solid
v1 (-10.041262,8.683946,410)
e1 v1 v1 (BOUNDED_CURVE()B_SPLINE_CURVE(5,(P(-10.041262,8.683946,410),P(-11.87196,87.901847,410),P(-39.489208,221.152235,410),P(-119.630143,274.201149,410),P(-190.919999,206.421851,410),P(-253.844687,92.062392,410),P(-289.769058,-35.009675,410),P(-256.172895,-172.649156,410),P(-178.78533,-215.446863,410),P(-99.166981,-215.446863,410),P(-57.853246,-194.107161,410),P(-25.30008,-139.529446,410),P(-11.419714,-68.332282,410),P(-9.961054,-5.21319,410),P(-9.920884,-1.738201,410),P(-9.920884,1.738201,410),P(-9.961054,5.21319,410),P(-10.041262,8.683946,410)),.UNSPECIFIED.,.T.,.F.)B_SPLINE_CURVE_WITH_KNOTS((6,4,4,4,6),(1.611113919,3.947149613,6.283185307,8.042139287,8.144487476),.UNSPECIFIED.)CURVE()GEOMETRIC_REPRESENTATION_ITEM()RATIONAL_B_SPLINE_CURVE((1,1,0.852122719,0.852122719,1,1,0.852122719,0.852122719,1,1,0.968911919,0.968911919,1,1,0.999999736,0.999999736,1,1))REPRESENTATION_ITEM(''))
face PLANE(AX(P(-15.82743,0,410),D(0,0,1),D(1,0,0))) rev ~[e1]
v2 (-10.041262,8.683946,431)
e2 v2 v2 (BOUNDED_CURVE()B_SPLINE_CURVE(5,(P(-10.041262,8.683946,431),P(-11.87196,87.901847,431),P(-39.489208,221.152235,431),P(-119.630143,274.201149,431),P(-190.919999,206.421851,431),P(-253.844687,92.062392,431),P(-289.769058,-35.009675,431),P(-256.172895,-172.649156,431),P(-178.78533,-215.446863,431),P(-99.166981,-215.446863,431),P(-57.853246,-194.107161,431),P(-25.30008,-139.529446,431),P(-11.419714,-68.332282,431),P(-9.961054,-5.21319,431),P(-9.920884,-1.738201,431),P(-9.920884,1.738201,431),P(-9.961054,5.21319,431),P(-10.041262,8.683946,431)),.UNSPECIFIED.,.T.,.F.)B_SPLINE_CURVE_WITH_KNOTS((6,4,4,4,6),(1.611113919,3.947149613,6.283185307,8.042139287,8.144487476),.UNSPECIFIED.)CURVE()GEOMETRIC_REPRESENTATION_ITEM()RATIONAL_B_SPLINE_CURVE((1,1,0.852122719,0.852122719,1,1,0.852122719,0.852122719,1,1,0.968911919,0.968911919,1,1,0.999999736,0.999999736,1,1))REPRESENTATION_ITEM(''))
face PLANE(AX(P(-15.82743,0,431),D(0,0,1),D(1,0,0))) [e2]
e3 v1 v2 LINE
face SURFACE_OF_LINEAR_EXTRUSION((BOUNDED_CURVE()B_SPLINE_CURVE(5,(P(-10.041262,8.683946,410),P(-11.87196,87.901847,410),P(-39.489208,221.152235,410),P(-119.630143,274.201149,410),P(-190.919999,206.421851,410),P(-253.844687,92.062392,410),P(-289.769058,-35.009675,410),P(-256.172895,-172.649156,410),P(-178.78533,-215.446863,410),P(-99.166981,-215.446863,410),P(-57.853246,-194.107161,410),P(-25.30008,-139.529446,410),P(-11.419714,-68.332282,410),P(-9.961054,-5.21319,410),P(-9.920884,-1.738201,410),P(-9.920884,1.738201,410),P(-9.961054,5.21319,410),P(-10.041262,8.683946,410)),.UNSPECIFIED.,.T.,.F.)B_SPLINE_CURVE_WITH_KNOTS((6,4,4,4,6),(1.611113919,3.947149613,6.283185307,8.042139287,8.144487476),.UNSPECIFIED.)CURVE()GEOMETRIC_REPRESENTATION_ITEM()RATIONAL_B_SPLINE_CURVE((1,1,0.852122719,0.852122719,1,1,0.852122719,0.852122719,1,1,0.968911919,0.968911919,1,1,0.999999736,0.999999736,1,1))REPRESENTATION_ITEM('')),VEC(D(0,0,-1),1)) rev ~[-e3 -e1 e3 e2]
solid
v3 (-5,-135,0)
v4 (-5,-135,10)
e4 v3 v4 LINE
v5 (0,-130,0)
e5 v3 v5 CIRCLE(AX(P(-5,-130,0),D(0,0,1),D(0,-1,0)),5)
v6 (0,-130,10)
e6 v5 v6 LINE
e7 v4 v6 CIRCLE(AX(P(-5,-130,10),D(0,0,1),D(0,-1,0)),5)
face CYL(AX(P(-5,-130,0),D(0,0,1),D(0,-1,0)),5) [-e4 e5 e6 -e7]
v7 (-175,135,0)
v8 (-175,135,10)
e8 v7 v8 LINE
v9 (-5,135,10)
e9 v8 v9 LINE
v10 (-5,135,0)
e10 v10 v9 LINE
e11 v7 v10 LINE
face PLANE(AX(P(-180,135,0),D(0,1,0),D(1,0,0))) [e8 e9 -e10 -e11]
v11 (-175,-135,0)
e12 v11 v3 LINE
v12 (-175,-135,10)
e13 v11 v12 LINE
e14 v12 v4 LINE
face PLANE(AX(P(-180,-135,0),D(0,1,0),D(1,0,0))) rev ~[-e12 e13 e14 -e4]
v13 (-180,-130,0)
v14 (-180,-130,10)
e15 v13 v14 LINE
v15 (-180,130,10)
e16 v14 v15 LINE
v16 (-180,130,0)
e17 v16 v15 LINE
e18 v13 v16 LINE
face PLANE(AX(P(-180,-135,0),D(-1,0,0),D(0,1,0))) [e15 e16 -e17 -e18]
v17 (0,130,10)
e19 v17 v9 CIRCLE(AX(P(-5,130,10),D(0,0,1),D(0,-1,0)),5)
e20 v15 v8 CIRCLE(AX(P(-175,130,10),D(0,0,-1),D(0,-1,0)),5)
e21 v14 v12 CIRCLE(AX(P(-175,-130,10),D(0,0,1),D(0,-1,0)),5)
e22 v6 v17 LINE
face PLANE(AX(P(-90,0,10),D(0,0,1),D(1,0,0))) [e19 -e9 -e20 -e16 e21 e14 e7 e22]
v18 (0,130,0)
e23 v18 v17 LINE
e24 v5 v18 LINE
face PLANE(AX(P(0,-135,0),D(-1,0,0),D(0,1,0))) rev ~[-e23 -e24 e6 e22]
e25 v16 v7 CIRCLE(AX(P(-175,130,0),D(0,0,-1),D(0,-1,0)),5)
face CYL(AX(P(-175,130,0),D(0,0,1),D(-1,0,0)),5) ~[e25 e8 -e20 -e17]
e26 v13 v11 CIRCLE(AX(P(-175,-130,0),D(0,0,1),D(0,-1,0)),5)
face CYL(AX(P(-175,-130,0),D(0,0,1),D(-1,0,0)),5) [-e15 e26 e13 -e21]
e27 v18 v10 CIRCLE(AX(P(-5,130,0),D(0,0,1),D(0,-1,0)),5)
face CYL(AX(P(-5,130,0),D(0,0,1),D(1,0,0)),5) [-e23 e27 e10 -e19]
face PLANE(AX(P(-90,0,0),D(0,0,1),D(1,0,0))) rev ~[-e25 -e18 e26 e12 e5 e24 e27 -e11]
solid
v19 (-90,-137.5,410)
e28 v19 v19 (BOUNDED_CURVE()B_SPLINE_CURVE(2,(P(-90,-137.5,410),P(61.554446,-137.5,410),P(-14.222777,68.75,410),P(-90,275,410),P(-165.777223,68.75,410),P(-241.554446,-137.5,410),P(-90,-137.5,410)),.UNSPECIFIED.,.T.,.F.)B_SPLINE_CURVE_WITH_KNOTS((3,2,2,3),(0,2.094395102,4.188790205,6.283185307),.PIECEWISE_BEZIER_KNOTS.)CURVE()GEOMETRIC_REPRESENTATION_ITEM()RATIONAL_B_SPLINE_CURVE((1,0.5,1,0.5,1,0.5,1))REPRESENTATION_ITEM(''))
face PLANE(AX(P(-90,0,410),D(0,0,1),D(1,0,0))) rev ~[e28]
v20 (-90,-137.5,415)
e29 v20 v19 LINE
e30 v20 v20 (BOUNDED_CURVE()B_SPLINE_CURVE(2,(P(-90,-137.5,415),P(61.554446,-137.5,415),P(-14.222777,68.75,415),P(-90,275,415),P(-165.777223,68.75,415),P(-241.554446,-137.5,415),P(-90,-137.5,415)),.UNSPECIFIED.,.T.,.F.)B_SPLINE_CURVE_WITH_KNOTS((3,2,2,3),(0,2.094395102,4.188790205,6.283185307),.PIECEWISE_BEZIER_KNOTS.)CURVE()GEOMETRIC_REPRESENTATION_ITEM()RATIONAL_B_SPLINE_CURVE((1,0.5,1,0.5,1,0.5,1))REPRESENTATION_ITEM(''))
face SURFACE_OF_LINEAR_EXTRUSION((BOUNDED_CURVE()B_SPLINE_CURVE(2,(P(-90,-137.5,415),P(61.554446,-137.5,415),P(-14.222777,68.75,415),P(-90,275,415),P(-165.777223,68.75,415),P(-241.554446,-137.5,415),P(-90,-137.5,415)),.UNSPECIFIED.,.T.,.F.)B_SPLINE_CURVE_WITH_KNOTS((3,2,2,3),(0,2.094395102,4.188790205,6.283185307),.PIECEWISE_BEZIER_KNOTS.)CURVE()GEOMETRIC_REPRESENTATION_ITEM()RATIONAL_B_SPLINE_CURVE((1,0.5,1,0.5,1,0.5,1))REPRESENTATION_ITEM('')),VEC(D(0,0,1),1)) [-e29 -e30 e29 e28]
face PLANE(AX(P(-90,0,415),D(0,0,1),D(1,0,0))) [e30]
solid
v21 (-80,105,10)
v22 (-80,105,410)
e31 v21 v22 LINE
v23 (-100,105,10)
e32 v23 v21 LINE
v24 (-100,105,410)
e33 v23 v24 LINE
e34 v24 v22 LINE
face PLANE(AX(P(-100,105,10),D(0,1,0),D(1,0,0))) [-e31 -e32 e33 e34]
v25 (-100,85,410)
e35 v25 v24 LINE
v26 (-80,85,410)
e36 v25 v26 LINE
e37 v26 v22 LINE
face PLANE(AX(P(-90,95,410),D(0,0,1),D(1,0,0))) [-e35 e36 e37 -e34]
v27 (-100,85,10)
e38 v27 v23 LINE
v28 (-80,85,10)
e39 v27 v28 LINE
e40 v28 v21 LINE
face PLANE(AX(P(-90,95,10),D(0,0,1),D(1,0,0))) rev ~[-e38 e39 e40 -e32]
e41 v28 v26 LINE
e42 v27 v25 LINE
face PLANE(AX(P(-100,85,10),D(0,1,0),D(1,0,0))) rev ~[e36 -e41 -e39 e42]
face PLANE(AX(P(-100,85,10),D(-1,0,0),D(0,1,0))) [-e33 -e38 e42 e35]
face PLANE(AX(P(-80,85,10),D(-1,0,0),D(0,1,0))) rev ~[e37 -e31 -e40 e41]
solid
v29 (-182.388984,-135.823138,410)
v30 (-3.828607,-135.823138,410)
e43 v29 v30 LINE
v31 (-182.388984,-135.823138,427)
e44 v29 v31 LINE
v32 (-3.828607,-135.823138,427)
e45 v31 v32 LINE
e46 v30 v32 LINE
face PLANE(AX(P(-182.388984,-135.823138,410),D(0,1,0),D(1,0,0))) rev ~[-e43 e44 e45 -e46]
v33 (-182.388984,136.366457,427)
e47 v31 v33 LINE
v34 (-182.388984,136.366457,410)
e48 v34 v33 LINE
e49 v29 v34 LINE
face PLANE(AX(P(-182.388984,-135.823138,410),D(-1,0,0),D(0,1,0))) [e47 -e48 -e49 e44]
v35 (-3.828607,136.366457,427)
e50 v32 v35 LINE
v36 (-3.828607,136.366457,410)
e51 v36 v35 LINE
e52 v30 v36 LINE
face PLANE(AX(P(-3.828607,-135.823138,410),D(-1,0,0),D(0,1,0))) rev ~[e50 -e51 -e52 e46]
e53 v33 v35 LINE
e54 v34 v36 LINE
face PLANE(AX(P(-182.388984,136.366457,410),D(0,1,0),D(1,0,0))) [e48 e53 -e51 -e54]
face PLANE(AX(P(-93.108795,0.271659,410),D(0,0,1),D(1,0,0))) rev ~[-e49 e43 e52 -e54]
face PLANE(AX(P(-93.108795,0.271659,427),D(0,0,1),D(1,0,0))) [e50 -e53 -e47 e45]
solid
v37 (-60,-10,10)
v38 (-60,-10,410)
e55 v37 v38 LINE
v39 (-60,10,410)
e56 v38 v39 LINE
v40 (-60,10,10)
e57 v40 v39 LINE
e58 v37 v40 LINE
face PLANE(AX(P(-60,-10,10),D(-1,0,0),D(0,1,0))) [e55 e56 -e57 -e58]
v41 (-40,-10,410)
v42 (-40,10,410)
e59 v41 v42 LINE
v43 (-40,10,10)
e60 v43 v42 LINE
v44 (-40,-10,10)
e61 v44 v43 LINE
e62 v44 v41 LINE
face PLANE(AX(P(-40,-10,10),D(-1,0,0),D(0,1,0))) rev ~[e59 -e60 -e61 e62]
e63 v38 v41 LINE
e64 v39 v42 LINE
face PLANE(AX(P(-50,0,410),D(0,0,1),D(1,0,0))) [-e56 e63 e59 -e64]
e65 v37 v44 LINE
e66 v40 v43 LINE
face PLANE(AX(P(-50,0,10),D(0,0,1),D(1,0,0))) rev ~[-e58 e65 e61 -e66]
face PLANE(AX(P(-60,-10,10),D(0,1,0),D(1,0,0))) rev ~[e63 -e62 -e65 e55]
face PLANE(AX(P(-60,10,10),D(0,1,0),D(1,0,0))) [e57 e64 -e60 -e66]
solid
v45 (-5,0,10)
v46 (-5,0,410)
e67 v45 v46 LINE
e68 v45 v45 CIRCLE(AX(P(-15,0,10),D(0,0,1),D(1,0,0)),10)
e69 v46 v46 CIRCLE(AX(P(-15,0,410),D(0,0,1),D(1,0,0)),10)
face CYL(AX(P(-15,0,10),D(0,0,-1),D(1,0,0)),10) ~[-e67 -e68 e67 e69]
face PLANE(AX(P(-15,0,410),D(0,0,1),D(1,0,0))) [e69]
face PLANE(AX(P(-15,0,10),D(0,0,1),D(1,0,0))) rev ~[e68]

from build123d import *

# Parameters (mm, degrees)
F0_W      = 180
F0_H      = 270
F1_DEPTH  = 10
F2_R      = 5
F3_R      = 10
F4_DEPTH  = 400
F8_DEPTH  = 21
F11_W     = 178.5603770986
F11_H     = 272.1895948052
F11_R     = 10
F12_DEPTH = 17
F18_W     = 20
F18_H     = 20
F19_DEPTH = 400
F23_START = -15
F23_DEPTH = 5
F24_W     = 20
F24_H     = 20
F25_DEPTH = 400


# Not quite as in the source:
# - the program builds the solid bodies; features that only make, move or delete a surface that nothing else refers to are left out


with BuildPart() as f1:
    # F0 (on Top) → F1 (new body)
    with BuildSketch(Plane.XY):
        with Locations((-90, 0)):
            Rectangle(F0_W, F0_H)
    extrude(amount=F1_DEPTH)

    # F2
    f2_edges = [f1.edges().sort_by_distance(p)[0] for p in [
        (-180, -135, 5),
        (0, -135, 5),
        (-180, 135, 5),
        (0, 135, 5),
    ]]
    fillet(f2_edges, radius=F2_R)


with BuildPart() as f4:
    # F3 (on face) → F4 (new body)
    with BuildSketch(Plane.XY.offset(10)):
        with Locations((-15, 0)):
            Circle(F3_R)
    extrude(amount=F4_DEPTH)


with BuildPart() as f8:
    # F7 (on face) → F8 (new body)
    with BuildSketch(Plane.XY.offset(410)):
        with BuildLine():
            ThreePointArc((-10.0412616183, 8.6839457427), (-25, 0), (-10.0412616183, -8.6839457427))
            add(Edge.make_bspline(
                [(-10.0412616183, -8.6839457427), (-9.8405786461, 0), (-10.0412616183, 8.6839457427)],
                knots=[1.5304787343, 1.5304787343, 1.5304787343, 1.6111139193, 1.6111139193, 1.6111139193], degree=2, weights=[1, 0.999187356, 1]))
        make_face()
        with BuildLine():
            add(Edge.make_bspline(
                [(-10.0412616183, 8.6839457427), (-21.7173481471, 513.9311064222), (-222.3823430066, 149.2421217958), (-423.0473378661, -215.4468628305), (-133.3660930395, -215.4468628305)],
                knots=[1.6111139193, 1.6111139193, 1.6111139193, 3.9471496133, 3.9471496133, 6.2831853072, 6.2831853072, 6.2831853072], degree=2, weights=[1, 0.3919759853, 1, 0.3919759853, 1]))
            add(Edge.make_bspline(
                [(-133.3660930395, -215.4468628305), (-14.8194808717, -215.4468628305), (-10.0412616183, -8.6839457427)],
                knots=[0, 0, 0, 1.5304787343, 1.5304787343, 1.5304787343], degree=2, weights=[1, 0.7212165662, 1]))
            ThreePointArc((-10.0412616183, -8.6839457427), (-25, 0), (-10.0412616183, 8.6839457427))
        make_face()
    extrude(amount=F8_DEPTH)


with BuildPart() as f12:
    # F11 (on face) → F12 (new body)
    with BuildSketch(Plane.XY.offset(410)):
        with Locations((-93.1087951176, 0.2716593444)):
            Rectangle(F11_W, F11_H)
        with Locations((-15, 0)):
            Circle(F11_R, mode=Mode.SUBTRACT)
        with Locations((-15, 0)):
            Circle(F11_R)
    extrude(amount=F12_DEPTH)


with BuildPart() as f19:
    # F18 (on face) → F19 (new body)
    with BuildSketch(Plane.XY.offset(10)):
        with Locations((-50, 0)):
            Rectangle(F18_W, F18_H)
    extrude(amount=F19_DEPTH)


with BuildPart() as f23:
    # F22 (on offset) → F23 (new body)
    with BuildSketch(Plane.XY.offset(430).offset(F23_START)):
        with BuildLine():
            add(Edge.make_bspline(
                [(-90, -137.5), (61.5544456623, -137.5), (-14.2227771689, 68.75), (-90, 275), (-165.7772228311, 68.75), (-241.5544456623, -137.5), (-90, -137.5)],
                knots=[0, 0, 0, 2.0943951024, 2.0943951024, 4.1887902048, 4.1887902048, 6.2831853072, 6.2831853072, 6.2831853072], degree=2, weights=[1, 0.5, 1, 0.5, 1, 0.5, 1]))
        make_face()
    extrude(amount=-F23_DEPTH)


with BuildPart() as f25:
    # F24 (on face) → F25 (new body)
    with BuildSketch(Plane.XY.offset(10)):
        with Locations((-90, 95)):
            Rectangle(F24_W, F24_H)
    extrude(amount=F25_DEPTH)


solid = Compound([f1.part, f4.part, f8.part, f12.part, f19.part, f23.part, f25.part])
